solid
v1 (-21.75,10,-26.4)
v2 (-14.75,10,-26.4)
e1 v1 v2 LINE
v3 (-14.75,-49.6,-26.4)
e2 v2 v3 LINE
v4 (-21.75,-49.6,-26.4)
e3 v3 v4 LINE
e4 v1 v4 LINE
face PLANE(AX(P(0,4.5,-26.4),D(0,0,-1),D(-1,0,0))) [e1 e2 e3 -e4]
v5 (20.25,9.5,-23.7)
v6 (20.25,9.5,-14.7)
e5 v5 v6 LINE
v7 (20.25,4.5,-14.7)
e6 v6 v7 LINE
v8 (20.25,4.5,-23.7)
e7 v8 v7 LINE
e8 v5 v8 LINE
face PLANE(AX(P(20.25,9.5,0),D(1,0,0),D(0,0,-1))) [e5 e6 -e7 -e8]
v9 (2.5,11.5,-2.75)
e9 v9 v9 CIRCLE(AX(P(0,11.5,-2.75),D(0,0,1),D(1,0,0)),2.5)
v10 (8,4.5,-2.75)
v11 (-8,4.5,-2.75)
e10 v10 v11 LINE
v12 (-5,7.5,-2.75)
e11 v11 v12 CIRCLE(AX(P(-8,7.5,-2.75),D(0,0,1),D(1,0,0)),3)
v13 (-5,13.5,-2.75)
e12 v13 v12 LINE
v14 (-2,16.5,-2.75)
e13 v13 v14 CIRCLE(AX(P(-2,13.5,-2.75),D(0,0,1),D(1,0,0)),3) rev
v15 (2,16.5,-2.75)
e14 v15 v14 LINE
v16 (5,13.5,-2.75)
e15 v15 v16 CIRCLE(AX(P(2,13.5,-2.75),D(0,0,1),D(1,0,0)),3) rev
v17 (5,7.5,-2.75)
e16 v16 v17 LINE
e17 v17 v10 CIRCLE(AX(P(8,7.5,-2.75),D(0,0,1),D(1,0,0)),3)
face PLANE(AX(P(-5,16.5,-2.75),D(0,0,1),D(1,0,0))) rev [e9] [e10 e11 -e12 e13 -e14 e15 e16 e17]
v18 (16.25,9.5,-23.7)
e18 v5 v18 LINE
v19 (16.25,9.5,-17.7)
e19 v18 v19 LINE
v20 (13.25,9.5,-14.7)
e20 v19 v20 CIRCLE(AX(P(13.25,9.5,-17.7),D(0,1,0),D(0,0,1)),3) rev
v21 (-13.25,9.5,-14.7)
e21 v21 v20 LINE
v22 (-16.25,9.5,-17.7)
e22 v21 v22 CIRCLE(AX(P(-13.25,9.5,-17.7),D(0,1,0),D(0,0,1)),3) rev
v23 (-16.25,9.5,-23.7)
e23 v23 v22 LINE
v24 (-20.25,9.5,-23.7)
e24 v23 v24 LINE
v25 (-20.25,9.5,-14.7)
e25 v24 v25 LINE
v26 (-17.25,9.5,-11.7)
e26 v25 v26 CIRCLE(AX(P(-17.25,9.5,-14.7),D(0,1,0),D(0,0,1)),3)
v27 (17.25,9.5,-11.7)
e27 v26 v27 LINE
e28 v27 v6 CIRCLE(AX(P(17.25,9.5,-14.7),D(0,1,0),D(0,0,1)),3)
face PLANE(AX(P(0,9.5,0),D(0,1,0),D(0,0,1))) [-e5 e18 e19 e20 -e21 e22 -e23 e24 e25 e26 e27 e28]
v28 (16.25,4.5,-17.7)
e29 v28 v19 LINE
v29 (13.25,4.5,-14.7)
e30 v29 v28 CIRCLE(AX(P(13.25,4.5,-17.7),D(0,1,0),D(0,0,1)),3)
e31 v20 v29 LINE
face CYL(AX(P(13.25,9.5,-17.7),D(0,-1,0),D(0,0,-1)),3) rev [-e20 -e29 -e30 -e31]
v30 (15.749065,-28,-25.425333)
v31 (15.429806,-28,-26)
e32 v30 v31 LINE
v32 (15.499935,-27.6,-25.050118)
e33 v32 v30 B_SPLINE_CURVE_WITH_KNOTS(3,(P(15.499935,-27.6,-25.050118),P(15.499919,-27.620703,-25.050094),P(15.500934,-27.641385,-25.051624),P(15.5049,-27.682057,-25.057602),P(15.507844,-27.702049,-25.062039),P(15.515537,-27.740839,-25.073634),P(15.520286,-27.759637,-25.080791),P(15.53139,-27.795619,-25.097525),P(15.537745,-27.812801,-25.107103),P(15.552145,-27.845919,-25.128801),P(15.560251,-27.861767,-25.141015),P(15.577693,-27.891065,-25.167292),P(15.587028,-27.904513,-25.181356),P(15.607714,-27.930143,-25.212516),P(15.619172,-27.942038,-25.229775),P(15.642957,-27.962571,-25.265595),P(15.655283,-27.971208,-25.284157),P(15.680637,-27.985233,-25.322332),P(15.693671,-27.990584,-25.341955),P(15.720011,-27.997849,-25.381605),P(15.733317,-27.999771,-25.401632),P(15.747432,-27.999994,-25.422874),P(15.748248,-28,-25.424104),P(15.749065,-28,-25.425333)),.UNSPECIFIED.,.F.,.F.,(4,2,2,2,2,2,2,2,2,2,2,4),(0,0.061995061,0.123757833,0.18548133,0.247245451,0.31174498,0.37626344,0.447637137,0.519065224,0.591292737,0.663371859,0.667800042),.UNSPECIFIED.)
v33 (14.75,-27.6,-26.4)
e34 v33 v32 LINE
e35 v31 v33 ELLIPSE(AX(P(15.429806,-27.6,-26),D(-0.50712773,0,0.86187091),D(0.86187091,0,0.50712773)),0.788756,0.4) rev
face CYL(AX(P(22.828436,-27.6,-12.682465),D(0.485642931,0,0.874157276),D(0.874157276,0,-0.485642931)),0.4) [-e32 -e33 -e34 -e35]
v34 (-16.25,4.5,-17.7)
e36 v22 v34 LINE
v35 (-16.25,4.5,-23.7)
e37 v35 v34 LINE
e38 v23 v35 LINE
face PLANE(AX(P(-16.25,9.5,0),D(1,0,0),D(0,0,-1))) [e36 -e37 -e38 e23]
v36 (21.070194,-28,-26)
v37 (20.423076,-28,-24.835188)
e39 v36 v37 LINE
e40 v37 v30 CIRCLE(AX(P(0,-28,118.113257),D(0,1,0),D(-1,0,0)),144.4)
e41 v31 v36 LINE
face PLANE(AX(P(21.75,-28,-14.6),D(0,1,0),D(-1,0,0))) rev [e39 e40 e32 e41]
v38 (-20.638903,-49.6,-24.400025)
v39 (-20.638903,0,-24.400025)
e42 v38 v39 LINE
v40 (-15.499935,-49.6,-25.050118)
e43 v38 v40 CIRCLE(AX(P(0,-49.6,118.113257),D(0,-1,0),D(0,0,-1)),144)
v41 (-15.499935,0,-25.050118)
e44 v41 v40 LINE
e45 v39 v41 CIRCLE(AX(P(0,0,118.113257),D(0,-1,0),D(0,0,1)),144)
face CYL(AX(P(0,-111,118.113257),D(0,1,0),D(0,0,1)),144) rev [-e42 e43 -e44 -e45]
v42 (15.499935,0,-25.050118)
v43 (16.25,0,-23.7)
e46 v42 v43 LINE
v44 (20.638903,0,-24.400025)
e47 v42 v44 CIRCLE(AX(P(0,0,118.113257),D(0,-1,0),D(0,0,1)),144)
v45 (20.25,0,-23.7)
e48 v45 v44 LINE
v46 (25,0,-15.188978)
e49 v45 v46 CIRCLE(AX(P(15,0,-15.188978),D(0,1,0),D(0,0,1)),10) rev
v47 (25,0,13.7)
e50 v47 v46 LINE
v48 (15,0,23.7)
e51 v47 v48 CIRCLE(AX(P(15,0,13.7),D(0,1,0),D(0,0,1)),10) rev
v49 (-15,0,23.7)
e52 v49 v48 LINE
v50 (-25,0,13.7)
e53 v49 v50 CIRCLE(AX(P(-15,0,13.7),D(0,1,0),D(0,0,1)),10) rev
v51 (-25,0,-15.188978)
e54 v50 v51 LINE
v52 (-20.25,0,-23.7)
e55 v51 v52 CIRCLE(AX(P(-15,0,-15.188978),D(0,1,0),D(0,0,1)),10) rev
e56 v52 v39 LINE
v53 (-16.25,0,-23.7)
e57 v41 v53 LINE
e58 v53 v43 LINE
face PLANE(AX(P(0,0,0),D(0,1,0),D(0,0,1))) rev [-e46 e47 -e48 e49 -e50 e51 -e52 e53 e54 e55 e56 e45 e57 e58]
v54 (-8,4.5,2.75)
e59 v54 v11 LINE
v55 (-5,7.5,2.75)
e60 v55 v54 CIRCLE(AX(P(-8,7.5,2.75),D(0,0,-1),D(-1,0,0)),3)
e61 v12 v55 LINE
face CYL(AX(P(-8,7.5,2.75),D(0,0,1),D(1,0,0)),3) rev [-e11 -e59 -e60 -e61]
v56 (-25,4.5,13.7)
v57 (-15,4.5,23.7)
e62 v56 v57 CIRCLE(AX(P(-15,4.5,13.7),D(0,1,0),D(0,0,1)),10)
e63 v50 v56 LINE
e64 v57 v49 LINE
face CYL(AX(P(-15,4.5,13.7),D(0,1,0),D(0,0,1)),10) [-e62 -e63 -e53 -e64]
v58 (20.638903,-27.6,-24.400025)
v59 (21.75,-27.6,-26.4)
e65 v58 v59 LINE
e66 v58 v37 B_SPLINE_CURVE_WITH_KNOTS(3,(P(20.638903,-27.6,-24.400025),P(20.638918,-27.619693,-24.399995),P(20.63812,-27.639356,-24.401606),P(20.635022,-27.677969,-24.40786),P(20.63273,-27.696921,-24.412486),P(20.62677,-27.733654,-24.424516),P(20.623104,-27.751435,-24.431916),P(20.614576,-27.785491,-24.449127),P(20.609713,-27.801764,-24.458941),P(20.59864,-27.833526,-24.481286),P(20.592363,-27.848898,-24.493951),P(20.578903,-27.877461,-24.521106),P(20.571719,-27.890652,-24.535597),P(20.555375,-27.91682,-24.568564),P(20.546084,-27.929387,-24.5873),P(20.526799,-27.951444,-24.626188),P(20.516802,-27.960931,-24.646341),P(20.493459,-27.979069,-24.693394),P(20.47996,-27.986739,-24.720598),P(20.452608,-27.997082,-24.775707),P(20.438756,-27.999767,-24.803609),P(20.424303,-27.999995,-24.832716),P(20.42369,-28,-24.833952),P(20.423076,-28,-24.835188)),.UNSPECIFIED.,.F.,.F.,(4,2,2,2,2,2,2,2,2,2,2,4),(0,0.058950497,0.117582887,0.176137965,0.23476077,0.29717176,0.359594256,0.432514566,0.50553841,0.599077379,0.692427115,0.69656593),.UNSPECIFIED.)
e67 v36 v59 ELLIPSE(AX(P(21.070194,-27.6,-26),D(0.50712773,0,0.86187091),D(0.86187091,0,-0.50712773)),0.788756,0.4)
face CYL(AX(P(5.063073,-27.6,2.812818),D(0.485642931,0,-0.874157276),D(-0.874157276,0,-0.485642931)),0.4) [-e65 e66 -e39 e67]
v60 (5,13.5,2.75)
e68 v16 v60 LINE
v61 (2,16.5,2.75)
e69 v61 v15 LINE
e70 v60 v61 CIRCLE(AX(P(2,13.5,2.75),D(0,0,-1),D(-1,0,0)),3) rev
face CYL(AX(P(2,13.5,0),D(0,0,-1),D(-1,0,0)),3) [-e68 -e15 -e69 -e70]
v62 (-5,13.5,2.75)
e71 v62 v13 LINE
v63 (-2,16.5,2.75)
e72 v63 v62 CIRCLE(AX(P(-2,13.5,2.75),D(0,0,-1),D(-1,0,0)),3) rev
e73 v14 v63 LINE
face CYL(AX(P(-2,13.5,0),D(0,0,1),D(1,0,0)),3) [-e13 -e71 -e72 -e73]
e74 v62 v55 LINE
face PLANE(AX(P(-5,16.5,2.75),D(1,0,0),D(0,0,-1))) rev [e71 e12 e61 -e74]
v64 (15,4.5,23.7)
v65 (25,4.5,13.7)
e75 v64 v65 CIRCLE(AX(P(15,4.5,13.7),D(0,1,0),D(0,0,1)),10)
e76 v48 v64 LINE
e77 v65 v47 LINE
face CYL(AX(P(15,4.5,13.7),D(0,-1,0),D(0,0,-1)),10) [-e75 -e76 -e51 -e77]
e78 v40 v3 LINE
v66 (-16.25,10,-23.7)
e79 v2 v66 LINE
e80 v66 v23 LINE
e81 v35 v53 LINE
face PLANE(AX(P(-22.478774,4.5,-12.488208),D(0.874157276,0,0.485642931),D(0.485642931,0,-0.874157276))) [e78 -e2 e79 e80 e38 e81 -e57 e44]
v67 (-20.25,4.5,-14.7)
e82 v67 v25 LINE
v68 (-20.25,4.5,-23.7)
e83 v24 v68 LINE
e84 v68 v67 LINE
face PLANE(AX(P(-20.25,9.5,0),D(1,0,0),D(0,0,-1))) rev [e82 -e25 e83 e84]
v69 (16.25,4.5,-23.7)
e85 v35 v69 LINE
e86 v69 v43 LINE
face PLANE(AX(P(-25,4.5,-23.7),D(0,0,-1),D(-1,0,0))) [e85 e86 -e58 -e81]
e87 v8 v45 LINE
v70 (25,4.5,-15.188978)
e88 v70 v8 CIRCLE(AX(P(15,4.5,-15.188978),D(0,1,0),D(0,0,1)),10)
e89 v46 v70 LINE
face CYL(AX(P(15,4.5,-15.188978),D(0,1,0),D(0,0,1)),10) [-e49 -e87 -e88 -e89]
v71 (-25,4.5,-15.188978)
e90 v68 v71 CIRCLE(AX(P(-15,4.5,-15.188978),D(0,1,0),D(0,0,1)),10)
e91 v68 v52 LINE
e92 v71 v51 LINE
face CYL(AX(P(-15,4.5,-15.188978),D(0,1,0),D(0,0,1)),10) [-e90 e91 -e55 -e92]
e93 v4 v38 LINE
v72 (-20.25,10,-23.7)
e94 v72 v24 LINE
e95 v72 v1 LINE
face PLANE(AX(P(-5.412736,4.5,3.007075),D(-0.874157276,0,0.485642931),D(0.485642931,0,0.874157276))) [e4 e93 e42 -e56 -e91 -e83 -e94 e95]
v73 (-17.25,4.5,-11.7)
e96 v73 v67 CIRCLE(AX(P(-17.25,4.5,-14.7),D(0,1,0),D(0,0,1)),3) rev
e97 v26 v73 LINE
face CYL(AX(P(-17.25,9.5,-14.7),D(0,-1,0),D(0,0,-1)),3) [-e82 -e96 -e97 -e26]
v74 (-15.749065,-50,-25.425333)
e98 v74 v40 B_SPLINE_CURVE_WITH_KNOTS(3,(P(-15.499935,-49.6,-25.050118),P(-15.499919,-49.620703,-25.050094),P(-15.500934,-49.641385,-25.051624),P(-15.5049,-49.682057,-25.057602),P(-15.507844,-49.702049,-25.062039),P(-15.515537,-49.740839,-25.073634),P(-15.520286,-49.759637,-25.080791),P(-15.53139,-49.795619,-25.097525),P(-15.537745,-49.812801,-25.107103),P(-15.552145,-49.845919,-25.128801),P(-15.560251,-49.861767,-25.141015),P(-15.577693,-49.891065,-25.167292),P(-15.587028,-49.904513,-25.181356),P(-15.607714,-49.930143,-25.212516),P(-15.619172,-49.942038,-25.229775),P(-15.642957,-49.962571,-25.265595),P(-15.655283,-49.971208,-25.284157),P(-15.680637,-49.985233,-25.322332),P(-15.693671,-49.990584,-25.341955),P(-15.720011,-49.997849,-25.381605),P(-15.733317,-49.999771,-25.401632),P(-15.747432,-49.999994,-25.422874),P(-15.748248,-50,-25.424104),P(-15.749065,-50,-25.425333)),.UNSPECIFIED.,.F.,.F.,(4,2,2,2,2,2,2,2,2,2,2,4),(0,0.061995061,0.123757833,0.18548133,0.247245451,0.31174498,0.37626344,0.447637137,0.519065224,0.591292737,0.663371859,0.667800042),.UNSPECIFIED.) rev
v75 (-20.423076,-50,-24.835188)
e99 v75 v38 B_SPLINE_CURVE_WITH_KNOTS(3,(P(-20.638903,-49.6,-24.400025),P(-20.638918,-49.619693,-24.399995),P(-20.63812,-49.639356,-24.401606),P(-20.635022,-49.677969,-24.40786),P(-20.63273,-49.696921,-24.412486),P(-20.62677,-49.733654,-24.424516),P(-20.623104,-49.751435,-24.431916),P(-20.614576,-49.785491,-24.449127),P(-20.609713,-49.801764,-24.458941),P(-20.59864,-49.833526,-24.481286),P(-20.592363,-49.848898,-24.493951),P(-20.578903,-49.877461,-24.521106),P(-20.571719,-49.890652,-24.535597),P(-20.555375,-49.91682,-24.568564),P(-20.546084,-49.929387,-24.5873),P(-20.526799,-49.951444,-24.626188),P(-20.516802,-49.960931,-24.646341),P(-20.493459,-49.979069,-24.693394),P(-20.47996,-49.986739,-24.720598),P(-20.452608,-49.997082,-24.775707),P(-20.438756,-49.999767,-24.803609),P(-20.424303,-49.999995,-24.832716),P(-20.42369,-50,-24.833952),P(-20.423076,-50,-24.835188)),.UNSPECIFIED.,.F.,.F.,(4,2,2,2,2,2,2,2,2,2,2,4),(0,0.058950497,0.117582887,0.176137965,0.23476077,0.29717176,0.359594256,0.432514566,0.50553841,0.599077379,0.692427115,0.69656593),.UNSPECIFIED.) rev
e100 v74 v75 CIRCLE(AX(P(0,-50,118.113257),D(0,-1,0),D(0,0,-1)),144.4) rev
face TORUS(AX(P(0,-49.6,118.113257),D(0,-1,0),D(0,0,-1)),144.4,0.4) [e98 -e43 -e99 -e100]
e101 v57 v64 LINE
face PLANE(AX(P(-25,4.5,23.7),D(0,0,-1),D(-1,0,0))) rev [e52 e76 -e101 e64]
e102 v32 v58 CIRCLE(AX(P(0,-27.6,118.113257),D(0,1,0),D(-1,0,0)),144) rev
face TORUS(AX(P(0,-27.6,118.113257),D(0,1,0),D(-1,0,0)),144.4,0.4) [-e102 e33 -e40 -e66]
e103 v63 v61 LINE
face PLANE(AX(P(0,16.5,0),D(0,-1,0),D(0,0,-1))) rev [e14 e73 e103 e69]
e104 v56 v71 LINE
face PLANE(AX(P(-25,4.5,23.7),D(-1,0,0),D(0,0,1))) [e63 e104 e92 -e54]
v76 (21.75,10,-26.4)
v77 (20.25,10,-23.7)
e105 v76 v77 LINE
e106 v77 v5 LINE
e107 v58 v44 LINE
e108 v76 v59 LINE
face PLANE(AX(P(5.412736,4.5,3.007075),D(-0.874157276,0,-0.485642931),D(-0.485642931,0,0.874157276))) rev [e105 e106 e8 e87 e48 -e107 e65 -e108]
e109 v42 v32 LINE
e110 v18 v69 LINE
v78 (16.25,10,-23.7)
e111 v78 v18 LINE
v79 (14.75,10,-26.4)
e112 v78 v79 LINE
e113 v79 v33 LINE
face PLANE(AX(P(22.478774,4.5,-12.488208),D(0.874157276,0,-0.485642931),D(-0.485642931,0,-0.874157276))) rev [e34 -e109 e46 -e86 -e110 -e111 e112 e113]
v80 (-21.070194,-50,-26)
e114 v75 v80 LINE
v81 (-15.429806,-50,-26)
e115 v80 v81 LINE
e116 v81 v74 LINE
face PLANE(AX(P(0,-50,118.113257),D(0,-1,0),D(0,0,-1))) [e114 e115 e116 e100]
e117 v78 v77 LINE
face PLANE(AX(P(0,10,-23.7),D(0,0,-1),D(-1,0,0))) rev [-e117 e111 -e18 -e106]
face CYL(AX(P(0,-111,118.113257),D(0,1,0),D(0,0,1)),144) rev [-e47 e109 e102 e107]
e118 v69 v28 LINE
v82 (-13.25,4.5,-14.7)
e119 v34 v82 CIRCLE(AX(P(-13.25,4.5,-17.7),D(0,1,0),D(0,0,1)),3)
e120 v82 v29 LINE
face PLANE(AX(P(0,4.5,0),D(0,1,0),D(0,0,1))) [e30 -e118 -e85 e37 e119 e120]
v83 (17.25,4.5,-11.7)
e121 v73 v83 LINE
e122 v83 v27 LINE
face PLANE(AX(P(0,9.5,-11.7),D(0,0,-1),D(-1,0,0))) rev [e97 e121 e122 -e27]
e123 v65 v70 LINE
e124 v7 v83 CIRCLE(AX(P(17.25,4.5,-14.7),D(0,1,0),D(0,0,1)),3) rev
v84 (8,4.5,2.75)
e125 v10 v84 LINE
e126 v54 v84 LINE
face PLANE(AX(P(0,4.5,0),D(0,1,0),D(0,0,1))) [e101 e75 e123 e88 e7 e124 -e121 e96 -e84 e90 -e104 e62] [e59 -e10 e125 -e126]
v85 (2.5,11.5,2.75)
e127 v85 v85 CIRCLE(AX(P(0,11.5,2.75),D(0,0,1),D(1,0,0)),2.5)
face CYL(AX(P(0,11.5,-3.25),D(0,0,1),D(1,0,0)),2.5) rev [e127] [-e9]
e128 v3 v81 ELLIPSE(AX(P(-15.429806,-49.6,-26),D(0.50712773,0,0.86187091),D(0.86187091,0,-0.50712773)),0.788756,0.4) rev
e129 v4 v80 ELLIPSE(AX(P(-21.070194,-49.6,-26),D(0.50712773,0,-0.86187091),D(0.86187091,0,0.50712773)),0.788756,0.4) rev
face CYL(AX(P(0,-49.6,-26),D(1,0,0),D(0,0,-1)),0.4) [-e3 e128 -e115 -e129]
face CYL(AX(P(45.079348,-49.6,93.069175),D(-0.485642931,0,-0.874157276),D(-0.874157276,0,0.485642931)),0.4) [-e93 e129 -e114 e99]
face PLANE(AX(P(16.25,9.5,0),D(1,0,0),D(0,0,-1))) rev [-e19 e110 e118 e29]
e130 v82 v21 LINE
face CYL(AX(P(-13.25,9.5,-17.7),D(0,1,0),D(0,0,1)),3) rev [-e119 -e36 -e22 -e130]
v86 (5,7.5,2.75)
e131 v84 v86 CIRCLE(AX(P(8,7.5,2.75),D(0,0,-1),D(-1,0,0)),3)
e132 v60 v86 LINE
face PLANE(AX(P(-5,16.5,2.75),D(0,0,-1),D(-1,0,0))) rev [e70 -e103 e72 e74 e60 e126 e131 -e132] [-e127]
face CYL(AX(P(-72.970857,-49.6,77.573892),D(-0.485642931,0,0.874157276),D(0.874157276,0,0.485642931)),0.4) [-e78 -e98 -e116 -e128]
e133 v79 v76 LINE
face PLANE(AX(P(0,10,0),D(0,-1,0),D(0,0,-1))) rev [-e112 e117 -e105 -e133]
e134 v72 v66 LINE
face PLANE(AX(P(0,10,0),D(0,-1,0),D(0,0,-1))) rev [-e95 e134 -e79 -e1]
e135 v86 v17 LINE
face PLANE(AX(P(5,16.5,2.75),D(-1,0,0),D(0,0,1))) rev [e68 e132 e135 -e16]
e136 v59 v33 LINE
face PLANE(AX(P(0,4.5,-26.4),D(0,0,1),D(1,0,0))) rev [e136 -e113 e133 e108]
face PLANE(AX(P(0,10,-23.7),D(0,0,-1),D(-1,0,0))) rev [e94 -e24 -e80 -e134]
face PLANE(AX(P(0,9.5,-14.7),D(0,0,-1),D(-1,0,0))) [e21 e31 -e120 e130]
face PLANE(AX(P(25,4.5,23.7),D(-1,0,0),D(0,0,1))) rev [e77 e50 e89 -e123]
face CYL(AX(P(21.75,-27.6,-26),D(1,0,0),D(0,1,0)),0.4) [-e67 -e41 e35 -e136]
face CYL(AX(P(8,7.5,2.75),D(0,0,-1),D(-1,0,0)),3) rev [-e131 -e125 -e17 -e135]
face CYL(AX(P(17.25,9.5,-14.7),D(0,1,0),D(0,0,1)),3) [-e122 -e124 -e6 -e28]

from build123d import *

# Parameters (mm, degrees)
EXTRUDE_1_DEPTH      = 4.5
EXTRUDE_2_DEPTH      = 40
EXTRUDE_2_DEPTH_BACK = 10
CUT_EXTRUDE_1_DEPTH  = 111
FILLET_1_R           = 10
SKETCH_4_W           = 16.25
SKETCH_4_H           = 3
EXTRUDE_3_DEPTH      = 5
FILLET_2_R           = 10
SKETCH_5_W           = 10
SKETCH_5_H           = 5.5
EXTRUDE_4_DEPTH      = 12
SKETCH_6_R           = 2.5
CUT_EXTRUDE_2_DEPTH  = 6
FILLET_3_R           = 3
FILLET_4_R           = 3
EXTRUDE_5_DEPTH      = 10
SKETCH_8_W           = 7
SKETCH_8_H           = 12
CUT_EXTRUDE_3_DEPTH  = 11.8
FILLET_5_R           = 0.4


with BuildPart() as part:
    # 草图1 → 凸台-拉伸1 (new body)
    with BuildSketch(Plane(origin=(0, 0, 0), x_dir=(1, 0, 0), z_dir=(0, 1, 0))):
        Polygon((-25, 23.7), (-25, -23.7), (25, -23.7), (25, 23.7), (20.25, 23.7), (21.75, 26.4), (14.75, 26.4), (16.25, 23.7), (-16.25, 23.7), (-14.75, 26.4), (-21.75, 26.4), (-20.25, 23.7), align=None)
    extrude(amount=EXTRUDE_1_DEPTH)

    # 草图2 → 凸台-拉伸2 (add, two sides: drawn at the far end of the back side and taken through both)
    with BuildSketch(Plane.XZ.offset(-EXTRUDE_2_DEPTH_BACK)):
        Polygon((-20.25, -23.7), (-16.25, -23.7), (-14.75, -26.4), (-21.75, -26.4), align=None)
        Polygon((16.25, -23.7), (20.25, -23.7), (21.75, -26.4), (14.75, -26.4), align=None)
    extrude(amount=EXTRUDE_2_DEPTH + EXTRUDE_2_DEPTH_BACK)

    # 草图3 → 切除-拉伸1 (cut)
    with BuildSketch(Plane.XZ):
        with BuildLine():
            Line((-25, -23.7), (25, -23.7))
            ThreePointArc((25, -23.7), (0, -25.88674251), (-25, -23.7))
        make_face()
    extrude(amount=CUT_EXTRUDE_1_DEPTH, mode=Mode.SUBTRACT)

    # 圆角1
    # the kernel refuses this fillet: 10 mm, written as the material it takes off along each edge
    with BuildSketch(Plane(origin=(25, -21.277555663, -23.7), x_dir=(0, 0, 1), z_dir=(0, 1, 0))) as fillet_1_piece_1:
        with BuildLine():
            CenterArc((8.511022265, -10), FILLET_1_R, 90, 58.331756746)
            Line((0, -4.75), (-0.170220445, -4.645))
            ThreePointArc((-0.170220445, -4.645), (-0.2, -2.375), (-0.2, 0))
            Line((-0.2, 0), (0, 0.2))
            Line((0, 0.2), (8.511022265, 0.2))
            Line((8.511022265, 0.2), (8.511022265, 0))
        make_face()
    extrude(amount=47.055111326, mode=Mode.SUBTRACT)
    with BuildSketch(Plane(origin=(-25, -21.277555663, -23.7), x_dir=(0, 0, 1), z_dir=(0, 1, 0))) as fillet_1_piece_2:
        with BuildLine():
            CenterArc((8.511022265, 10), FILLET_1_R, 211.668243254, 58.331756746)
            Line((0, 4.75), (-0.170220445, 4.645))
            ThreePointArc((-0.170220445, 4.645), (-0.2, 2.375), (-0.2, 0))
            Line((-0.2, 0), (0, -0.2))
            Line((0, -0.2), (8.511022265, -0.2))
            Line((8.511022265, -0.2), (8.511022265, 0))
        make_face()
    extrude(amount=47.055111326, mode=Mode.SUBTRACT)

    # 草图4 → 凸台-拉伸3 (add)
    with BuildSketch(Plane(origin=(0, 4.5, 0), x_dir=(1, 0, 0), z_dir=(0, 1, 0))):
        Polygon((-16.25, 23.7), (-20.25, 23.7), (-20.25, 11.7), (-16.25, 11.7), (-16.25, 14.7), align=None)
        with Locations((-8.125, 13.2)):
            Rectangle(SKETCH_4_W, SKETCH_4_H)
        with Locations((8.125, 13.2)):
            Rectangle(SKETCH_4_W, SKETCH_4_H)
        Polygon((16.25, 14.7), (16.25, 11.7), (20.25, 11.7), (20.25, 23.7), (16.25, 23.7), align=None)
    extrude(amount=EXTRUDE_3_DEPTH)

    # 圆角2
    fillet_2_edges = [part.edges().sort_by_distance(p)[0] for p in [
        (-25, 2.25, 23.7),
        (25, 2.25, 23.7),
    ]]
    fillet(fillet_2_edges, radius=FILLET_2_R)

    # 草图5 → 凸台-拉伸4 (add)
    with BuildSketch(Plane(origin=(0, 4.5, 0), x_dir=(1, 0, 0), z_dir=(0, 1, 0))):
        Rectangle(SKETCH_5_W, SKETCH_5_H)
    extrude(amount=EXTRUDE_4_DEPTH)

    # 草图6 → 切除-拉伸2 (cut)
    with BuildSketch(Plane.XY.offset(2.75)):
        with Locations((0, 11.5)):
            Circle(SKETCH_6_R)
    extrude(amount=-CUT_EXTRUDE_2_DEPTH, mode=Mode.SUBTRACT)

    # 圆角3
    fillet_3_edges = [part.edges().sort_by_distance(p)[0] for p in [
        (5, 4.5, 0),
        (-5, 4.5, 0),
        (5, 16.5, 0),
        (-5, 16.5, 0),
    ]]
    fillet(fillet_3_edges, radius=FILLET_3_R)

    # 圆角4
    fillet_4_edges = [part.edges().sort_by_distance(p)[0] for p in [
        (-16.25, 7, -14.7),
        (-20.25, 7, -11.7),
        (20.25, 7, -11.7),
        (16.25, 7, -14.7),
    ]]
    fillet(fillet_4_edges, radius=FILLET_4_R)

    # 草图7 → 凸台-拉伸5 (add)
    with BuildSketch(Plane.XZ.offset(40)):
        with BuildLine():
            Line((-14.75, -26.4), (-15.499934547, -25.050117816))
            ThreePointArc((-15.499934547, -25.050117816), (-18.072342022, -24.748180462), (-20.638902789, -24.400025019))
            Line((-20.638902789, -24.400025019), (-21.75, -26.4))
            Line((-21.75, -26.4), (-14.75, -26.4))
        make_face()
    extrude(amount=EXTRUDE_5_DEPTH)

    # 草图8 → 切除-拉伸3 (cut)
    with BuildSketch(Plane(origin=(0, 0, -26.4), x_dir=(-1, 0, 0), z_dir=(0, 0, -1))):
        with Locations((-18.25, -34)):
            Rectangle(SKETCH_8_W, SKETCH_8_H)
    extrude(amount=-CUT_EXTRUDE_3_DEPTH, mode=Mode.SUBTRACT)

    # 圆角5
    fillet_5_edges = [part.edges().sort_by_distance(p)[0] for p in [
        (-18.25, -50, -26.4),
        (-15.124967273, -50, -25.725058908),
        (-18.072342022, -50, -24.748180462),
        (-21.194451394, -50, -25.40001251),
        (18.072342022, -28, -24.748180462),
        (21.194451394, -28, -25.40001251),
        (15.124967273, -28, -25.725058908),
        (18.25, -28, -26.4),
    ]]
    fillet(fillet_5_edges, radius=FILLET_5_R)


solid = part.part
